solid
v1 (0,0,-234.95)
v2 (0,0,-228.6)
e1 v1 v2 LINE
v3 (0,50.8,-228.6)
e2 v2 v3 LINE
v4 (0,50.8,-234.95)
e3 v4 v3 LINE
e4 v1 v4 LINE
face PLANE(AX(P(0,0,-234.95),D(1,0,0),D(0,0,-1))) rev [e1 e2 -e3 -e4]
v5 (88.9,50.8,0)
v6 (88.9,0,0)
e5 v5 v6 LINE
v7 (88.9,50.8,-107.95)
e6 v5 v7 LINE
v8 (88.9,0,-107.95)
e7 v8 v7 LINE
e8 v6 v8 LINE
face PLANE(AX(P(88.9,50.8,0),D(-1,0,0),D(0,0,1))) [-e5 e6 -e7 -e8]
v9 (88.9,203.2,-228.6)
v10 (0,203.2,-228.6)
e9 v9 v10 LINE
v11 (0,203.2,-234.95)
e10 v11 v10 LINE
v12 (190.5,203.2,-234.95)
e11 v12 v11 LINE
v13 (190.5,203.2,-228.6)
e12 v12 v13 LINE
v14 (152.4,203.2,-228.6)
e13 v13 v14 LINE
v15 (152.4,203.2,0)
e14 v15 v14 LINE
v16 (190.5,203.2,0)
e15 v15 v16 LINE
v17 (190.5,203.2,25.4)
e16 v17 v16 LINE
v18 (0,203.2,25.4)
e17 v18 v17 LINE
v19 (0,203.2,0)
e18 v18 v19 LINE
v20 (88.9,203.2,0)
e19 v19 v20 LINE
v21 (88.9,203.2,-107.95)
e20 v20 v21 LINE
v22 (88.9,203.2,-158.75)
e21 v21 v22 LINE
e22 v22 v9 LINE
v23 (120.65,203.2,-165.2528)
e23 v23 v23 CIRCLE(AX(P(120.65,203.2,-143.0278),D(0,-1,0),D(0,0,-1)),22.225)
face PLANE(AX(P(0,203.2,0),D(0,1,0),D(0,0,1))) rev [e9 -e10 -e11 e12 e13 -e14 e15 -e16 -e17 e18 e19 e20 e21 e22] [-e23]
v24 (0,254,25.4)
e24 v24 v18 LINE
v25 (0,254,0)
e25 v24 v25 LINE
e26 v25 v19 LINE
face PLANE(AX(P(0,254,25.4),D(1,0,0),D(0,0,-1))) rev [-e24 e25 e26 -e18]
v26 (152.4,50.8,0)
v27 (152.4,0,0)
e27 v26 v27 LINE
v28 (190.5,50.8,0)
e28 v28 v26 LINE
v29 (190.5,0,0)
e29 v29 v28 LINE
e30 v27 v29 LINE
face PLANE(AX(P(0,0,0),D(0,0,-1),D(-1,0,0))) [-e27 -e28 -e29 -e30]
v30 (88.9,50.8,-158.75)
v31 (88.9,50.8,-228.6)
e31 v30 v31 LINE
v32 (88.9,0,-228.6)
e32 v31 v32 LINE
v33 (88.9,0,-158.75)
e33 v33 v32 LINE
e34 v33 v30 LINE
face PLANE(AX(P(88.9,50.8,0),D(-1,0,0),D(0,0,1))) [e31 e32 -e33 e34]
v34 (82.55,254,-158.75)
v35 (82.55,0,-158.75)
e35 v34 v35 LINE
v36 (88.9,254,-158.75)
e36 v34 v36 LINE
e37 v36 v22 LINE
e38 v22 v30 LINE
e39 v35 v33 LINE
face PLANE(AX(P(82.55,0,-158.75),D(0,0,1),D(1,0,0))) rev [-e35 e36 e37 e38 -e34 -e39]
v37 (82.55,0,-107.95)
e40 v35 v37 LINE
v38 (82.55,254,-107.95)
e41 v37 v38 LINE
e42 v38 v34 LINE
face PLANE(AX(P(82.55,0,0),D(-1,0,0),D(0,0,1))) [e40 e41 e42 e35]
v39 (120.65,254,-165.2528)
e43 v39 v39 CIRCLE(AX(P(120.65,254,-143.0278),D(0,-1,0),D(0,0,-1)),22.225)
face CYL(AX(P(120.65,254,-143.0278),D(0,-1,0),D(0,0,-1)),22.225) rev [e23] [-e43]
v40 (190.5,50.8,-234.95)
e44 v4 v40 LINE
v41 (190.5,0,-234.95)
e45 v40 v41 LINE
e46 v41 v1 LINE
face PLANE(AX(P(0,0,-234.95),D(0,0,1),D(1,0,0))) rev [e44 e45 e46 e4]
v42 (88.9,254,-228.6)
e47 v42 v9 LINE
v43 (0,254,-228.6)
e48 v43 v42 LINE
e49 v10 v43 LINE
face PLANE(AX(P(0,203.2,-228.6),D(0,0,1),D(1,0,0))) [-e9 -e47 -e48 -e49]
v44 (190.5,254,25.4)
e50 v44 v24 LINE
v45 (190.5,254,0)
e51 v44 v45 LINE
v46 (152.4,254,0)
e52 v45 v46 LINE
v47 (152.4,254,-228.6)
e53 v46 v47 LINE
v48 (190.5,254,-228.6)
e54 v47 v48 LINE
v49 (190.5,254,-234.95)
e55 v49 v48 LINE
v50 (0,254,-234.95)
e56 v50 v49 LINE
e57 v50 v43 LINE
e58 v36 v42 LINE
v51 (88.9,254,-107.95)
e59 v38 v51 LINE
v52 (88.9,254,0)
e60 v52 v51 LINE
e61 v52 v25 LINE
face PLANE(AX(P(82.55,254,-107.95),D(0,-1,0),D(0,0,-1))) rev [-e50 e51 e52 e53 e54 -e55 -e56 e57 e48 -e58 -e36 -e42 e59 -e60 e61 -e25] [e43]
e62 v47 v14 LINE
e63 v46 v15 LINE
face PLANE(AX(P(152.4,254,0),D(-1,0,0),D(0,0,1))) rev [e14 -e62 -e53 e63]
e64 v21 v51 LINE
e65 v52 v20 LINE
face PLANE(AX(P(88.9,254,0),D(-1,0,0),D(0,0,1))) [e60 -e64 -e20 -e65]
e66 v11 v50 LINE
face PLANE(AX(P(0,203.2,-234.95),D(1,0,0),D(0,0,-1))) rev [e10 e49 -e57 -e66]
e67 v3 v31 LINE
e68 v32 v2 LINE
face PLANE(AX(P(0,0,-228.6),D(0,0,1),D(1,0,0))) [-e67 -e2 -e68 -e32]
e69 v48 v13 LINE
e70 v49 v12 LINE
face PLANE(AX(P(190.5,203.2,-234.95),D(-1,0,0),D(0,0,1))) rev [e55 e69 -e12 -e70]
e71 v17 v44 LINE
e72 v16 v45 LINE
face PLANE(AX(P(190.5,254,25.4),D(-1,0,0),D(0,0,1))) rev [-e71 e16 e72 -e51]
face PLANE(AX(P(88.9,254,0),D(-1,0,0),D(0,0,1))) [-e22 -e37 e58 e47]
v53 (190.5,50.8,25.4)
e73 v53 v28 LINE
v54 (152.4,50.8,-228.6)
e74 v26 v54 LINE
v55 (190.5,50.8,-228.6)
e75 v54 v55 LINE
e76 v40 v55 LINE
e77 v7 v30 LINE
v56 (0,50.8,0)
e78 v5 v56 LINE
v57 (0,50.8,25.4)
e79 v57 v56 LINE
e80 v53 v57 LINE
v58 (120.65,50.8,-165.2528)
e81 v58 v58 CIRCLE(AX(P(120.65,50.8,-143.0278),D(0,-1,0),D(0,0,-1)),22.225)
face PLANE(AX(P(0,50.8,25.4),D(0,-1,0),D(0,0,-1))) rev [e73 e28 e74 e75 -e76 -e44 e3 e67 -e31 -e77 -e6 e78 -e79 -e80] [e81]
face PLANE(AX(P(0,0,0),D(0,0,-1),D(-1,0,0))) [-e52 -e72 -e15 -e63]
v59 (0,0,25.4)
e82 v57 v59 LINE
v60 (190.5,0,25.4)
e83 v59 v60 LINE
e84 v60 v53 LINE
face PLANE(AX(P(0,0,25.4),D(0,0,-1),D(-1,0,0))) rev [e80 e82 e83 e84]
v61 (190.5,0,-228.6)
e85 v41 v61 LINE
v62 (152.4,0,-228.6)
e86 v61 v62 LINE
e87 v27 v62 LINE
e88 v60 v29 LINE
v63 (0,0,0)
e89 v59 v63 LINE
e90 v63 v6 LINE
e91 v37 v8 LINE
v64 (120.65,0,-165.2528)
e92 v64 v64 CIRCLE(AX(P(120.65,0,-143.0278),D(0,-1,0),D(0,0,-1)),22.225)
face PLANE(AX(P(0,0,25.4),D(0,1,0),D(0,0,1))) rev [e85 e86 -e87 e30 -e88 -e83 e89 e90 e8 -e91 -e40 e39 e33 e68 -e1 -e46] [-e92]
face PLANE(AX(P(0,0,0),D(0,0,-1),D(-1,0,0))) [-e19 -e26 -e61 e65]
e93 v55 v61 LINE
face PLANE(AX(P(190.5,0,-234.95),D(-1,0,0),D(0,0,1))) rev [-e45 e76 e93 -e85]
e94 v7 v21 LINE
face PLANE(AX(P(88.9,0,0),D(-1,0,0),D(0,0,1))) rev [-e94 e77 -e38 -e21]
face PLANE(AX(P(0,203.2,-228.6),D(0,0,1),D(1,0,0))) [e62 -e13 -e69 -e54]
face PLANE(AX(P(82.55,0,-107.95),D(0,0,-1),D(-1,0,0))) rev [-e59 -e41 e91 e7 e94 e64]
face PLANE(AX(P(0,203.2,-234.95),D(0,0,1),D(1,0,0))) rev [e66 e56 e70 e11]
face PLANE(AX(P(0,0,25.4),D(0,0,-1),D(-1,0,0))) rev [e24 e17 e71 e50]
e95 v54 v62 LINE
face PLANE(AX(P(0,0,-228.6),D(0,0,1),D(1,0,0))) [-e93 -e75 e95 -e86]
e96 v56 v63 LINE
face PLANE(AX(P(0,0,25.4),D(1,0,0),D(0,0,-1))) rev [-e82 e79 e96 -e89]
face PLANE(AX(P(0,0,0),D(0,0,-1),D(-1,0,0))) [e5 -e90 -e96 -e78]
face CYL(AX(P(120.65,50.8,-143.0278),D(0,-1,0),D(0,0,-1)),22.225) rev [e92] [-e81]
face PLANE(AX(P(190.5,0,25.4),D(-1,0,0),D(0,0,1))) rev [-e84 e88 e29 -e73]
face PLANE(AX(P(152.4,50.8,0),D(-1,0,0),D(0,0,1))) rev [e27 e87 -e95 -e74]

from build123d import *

# Parameters (mm, degrees)
SKETCH1_W           = 190.5
SKETCH1_H           = 50.8
BOSS_EXTRUDE1_DEPTH = 25.4
SKETCH2_W           = 63.5
SKETCH2_H           = 228.6
BOSS_EXTRUDE2_DEPTH = 50.8
SKETCH3_W           = 190.5
SKETCH3_H           = 50.8
BOSS_EXTRUDE3_DEPTH = 6.35
SKETCH4_R           = 22.225
CUT_EXTRUDE1_DEPTH  = 307.712230764
SKETCH5_W           = 50.8
SKETCH5_H           = 254
BOSS_EXTRUDE4_DEPTH = 6.35
LPATTERN2_START     = 203.2
LPATTERN2_OUTLINE_R = 22.225
LPATTERN2_DEPTH     = 50.8
SKETCH6_W           = 190.5
SKETCH6_H           = 50.8
BOSS_EXTRUDE5_DEPTH = 25.4


# Read off the part's stored shape, not the designer's step: LPattern2
with BuildPart() as part:
    # Sketch1 → Boss-Extrude1 (new body)
    with BuildSketch(Plane.XY):
        with Locations((95.25, 25.4)):
            Rectangle(SKETCH1_W, SKETCH1_H)
    extrude(amount=BOSS_EXTRUDE1_DEPTH)

    # Sketch2 → Boss-Extrude2 (add)
    with BuildSketch(Plane.XZ):
        with Locations((120.65, -114.3)):
            Rectangle(SKETCH2_W, SKETCH2_H)
    extrude(amount=-BOSS_EXTRUDE2_DEPTH)

    # Sketch3 → Boss-Extrude3 (add)
    with BuildSketch(Plane(origin=(0, 0, -228.6), x_dir=(-1, 0, 0), z_dir=(0, 0, -1))):
        with Locations((-95.25, 25.4)):
            Rectangle(SKETCH3_W, SKETCH3_H)
    extrude(amount=BOSS_EXTRUDE3_DEPTH)

    # Sketch4 → Cut-Extrude1 (cut, through all)
    with BuildSketch(Plane.XZ):
        with Locations(Location((120.65, -143.027799697, 0), (0, 0, 270))):
            Circle(SKETCH4_R)
    extrude(amount=-CUT_EXTRUDE1_DEPTH, mode=Mode.SUBTRACT)

    # Sketch5 → Boss-Extrude4 (add)
    with BuildSketch(Plane.ZY.offset(-88.9)):
        with Locations((-133.35, 127)):
            Rectangle(SKETCH5_W, SKETCH5_H)
    extrude(amount=BOSS_EXTRUDE4_DEPTH)

    # LPattern2 outline → LPattern2 (add)
    with BuildSketch(Plane(origin=(0, 0, 0), x_dir=(1, 0, 0), z_dir=(0, 1, 0)).offset(LPATTERN2_START)):
        Polygon((88.9, 228.6), (88.9, 0), (152.4, 0), (152.4, 228.6), (190.5, 228.6), (190.5, 234.95), (0, 234.95), (0, 228.6), align=None)
        with Locations((120.65, 143.027799697)):
            Circle(LPATTERN2_OUTLINE_R, mode=Mode.SUBTRACT)
    extrude(amount=LPATTERN2_DEPTH)

    # Sketch6 → Boss-Extrude5 (add)
    with BuildSketch(Plane.XY):
        with Locations((95.25, 228.6)):
            Rectangle(SKETCH6_W, SKETCH6_H)
    extrude(amount=BOSS_EXTRUDE5_DEPTH)


solid = part.part
